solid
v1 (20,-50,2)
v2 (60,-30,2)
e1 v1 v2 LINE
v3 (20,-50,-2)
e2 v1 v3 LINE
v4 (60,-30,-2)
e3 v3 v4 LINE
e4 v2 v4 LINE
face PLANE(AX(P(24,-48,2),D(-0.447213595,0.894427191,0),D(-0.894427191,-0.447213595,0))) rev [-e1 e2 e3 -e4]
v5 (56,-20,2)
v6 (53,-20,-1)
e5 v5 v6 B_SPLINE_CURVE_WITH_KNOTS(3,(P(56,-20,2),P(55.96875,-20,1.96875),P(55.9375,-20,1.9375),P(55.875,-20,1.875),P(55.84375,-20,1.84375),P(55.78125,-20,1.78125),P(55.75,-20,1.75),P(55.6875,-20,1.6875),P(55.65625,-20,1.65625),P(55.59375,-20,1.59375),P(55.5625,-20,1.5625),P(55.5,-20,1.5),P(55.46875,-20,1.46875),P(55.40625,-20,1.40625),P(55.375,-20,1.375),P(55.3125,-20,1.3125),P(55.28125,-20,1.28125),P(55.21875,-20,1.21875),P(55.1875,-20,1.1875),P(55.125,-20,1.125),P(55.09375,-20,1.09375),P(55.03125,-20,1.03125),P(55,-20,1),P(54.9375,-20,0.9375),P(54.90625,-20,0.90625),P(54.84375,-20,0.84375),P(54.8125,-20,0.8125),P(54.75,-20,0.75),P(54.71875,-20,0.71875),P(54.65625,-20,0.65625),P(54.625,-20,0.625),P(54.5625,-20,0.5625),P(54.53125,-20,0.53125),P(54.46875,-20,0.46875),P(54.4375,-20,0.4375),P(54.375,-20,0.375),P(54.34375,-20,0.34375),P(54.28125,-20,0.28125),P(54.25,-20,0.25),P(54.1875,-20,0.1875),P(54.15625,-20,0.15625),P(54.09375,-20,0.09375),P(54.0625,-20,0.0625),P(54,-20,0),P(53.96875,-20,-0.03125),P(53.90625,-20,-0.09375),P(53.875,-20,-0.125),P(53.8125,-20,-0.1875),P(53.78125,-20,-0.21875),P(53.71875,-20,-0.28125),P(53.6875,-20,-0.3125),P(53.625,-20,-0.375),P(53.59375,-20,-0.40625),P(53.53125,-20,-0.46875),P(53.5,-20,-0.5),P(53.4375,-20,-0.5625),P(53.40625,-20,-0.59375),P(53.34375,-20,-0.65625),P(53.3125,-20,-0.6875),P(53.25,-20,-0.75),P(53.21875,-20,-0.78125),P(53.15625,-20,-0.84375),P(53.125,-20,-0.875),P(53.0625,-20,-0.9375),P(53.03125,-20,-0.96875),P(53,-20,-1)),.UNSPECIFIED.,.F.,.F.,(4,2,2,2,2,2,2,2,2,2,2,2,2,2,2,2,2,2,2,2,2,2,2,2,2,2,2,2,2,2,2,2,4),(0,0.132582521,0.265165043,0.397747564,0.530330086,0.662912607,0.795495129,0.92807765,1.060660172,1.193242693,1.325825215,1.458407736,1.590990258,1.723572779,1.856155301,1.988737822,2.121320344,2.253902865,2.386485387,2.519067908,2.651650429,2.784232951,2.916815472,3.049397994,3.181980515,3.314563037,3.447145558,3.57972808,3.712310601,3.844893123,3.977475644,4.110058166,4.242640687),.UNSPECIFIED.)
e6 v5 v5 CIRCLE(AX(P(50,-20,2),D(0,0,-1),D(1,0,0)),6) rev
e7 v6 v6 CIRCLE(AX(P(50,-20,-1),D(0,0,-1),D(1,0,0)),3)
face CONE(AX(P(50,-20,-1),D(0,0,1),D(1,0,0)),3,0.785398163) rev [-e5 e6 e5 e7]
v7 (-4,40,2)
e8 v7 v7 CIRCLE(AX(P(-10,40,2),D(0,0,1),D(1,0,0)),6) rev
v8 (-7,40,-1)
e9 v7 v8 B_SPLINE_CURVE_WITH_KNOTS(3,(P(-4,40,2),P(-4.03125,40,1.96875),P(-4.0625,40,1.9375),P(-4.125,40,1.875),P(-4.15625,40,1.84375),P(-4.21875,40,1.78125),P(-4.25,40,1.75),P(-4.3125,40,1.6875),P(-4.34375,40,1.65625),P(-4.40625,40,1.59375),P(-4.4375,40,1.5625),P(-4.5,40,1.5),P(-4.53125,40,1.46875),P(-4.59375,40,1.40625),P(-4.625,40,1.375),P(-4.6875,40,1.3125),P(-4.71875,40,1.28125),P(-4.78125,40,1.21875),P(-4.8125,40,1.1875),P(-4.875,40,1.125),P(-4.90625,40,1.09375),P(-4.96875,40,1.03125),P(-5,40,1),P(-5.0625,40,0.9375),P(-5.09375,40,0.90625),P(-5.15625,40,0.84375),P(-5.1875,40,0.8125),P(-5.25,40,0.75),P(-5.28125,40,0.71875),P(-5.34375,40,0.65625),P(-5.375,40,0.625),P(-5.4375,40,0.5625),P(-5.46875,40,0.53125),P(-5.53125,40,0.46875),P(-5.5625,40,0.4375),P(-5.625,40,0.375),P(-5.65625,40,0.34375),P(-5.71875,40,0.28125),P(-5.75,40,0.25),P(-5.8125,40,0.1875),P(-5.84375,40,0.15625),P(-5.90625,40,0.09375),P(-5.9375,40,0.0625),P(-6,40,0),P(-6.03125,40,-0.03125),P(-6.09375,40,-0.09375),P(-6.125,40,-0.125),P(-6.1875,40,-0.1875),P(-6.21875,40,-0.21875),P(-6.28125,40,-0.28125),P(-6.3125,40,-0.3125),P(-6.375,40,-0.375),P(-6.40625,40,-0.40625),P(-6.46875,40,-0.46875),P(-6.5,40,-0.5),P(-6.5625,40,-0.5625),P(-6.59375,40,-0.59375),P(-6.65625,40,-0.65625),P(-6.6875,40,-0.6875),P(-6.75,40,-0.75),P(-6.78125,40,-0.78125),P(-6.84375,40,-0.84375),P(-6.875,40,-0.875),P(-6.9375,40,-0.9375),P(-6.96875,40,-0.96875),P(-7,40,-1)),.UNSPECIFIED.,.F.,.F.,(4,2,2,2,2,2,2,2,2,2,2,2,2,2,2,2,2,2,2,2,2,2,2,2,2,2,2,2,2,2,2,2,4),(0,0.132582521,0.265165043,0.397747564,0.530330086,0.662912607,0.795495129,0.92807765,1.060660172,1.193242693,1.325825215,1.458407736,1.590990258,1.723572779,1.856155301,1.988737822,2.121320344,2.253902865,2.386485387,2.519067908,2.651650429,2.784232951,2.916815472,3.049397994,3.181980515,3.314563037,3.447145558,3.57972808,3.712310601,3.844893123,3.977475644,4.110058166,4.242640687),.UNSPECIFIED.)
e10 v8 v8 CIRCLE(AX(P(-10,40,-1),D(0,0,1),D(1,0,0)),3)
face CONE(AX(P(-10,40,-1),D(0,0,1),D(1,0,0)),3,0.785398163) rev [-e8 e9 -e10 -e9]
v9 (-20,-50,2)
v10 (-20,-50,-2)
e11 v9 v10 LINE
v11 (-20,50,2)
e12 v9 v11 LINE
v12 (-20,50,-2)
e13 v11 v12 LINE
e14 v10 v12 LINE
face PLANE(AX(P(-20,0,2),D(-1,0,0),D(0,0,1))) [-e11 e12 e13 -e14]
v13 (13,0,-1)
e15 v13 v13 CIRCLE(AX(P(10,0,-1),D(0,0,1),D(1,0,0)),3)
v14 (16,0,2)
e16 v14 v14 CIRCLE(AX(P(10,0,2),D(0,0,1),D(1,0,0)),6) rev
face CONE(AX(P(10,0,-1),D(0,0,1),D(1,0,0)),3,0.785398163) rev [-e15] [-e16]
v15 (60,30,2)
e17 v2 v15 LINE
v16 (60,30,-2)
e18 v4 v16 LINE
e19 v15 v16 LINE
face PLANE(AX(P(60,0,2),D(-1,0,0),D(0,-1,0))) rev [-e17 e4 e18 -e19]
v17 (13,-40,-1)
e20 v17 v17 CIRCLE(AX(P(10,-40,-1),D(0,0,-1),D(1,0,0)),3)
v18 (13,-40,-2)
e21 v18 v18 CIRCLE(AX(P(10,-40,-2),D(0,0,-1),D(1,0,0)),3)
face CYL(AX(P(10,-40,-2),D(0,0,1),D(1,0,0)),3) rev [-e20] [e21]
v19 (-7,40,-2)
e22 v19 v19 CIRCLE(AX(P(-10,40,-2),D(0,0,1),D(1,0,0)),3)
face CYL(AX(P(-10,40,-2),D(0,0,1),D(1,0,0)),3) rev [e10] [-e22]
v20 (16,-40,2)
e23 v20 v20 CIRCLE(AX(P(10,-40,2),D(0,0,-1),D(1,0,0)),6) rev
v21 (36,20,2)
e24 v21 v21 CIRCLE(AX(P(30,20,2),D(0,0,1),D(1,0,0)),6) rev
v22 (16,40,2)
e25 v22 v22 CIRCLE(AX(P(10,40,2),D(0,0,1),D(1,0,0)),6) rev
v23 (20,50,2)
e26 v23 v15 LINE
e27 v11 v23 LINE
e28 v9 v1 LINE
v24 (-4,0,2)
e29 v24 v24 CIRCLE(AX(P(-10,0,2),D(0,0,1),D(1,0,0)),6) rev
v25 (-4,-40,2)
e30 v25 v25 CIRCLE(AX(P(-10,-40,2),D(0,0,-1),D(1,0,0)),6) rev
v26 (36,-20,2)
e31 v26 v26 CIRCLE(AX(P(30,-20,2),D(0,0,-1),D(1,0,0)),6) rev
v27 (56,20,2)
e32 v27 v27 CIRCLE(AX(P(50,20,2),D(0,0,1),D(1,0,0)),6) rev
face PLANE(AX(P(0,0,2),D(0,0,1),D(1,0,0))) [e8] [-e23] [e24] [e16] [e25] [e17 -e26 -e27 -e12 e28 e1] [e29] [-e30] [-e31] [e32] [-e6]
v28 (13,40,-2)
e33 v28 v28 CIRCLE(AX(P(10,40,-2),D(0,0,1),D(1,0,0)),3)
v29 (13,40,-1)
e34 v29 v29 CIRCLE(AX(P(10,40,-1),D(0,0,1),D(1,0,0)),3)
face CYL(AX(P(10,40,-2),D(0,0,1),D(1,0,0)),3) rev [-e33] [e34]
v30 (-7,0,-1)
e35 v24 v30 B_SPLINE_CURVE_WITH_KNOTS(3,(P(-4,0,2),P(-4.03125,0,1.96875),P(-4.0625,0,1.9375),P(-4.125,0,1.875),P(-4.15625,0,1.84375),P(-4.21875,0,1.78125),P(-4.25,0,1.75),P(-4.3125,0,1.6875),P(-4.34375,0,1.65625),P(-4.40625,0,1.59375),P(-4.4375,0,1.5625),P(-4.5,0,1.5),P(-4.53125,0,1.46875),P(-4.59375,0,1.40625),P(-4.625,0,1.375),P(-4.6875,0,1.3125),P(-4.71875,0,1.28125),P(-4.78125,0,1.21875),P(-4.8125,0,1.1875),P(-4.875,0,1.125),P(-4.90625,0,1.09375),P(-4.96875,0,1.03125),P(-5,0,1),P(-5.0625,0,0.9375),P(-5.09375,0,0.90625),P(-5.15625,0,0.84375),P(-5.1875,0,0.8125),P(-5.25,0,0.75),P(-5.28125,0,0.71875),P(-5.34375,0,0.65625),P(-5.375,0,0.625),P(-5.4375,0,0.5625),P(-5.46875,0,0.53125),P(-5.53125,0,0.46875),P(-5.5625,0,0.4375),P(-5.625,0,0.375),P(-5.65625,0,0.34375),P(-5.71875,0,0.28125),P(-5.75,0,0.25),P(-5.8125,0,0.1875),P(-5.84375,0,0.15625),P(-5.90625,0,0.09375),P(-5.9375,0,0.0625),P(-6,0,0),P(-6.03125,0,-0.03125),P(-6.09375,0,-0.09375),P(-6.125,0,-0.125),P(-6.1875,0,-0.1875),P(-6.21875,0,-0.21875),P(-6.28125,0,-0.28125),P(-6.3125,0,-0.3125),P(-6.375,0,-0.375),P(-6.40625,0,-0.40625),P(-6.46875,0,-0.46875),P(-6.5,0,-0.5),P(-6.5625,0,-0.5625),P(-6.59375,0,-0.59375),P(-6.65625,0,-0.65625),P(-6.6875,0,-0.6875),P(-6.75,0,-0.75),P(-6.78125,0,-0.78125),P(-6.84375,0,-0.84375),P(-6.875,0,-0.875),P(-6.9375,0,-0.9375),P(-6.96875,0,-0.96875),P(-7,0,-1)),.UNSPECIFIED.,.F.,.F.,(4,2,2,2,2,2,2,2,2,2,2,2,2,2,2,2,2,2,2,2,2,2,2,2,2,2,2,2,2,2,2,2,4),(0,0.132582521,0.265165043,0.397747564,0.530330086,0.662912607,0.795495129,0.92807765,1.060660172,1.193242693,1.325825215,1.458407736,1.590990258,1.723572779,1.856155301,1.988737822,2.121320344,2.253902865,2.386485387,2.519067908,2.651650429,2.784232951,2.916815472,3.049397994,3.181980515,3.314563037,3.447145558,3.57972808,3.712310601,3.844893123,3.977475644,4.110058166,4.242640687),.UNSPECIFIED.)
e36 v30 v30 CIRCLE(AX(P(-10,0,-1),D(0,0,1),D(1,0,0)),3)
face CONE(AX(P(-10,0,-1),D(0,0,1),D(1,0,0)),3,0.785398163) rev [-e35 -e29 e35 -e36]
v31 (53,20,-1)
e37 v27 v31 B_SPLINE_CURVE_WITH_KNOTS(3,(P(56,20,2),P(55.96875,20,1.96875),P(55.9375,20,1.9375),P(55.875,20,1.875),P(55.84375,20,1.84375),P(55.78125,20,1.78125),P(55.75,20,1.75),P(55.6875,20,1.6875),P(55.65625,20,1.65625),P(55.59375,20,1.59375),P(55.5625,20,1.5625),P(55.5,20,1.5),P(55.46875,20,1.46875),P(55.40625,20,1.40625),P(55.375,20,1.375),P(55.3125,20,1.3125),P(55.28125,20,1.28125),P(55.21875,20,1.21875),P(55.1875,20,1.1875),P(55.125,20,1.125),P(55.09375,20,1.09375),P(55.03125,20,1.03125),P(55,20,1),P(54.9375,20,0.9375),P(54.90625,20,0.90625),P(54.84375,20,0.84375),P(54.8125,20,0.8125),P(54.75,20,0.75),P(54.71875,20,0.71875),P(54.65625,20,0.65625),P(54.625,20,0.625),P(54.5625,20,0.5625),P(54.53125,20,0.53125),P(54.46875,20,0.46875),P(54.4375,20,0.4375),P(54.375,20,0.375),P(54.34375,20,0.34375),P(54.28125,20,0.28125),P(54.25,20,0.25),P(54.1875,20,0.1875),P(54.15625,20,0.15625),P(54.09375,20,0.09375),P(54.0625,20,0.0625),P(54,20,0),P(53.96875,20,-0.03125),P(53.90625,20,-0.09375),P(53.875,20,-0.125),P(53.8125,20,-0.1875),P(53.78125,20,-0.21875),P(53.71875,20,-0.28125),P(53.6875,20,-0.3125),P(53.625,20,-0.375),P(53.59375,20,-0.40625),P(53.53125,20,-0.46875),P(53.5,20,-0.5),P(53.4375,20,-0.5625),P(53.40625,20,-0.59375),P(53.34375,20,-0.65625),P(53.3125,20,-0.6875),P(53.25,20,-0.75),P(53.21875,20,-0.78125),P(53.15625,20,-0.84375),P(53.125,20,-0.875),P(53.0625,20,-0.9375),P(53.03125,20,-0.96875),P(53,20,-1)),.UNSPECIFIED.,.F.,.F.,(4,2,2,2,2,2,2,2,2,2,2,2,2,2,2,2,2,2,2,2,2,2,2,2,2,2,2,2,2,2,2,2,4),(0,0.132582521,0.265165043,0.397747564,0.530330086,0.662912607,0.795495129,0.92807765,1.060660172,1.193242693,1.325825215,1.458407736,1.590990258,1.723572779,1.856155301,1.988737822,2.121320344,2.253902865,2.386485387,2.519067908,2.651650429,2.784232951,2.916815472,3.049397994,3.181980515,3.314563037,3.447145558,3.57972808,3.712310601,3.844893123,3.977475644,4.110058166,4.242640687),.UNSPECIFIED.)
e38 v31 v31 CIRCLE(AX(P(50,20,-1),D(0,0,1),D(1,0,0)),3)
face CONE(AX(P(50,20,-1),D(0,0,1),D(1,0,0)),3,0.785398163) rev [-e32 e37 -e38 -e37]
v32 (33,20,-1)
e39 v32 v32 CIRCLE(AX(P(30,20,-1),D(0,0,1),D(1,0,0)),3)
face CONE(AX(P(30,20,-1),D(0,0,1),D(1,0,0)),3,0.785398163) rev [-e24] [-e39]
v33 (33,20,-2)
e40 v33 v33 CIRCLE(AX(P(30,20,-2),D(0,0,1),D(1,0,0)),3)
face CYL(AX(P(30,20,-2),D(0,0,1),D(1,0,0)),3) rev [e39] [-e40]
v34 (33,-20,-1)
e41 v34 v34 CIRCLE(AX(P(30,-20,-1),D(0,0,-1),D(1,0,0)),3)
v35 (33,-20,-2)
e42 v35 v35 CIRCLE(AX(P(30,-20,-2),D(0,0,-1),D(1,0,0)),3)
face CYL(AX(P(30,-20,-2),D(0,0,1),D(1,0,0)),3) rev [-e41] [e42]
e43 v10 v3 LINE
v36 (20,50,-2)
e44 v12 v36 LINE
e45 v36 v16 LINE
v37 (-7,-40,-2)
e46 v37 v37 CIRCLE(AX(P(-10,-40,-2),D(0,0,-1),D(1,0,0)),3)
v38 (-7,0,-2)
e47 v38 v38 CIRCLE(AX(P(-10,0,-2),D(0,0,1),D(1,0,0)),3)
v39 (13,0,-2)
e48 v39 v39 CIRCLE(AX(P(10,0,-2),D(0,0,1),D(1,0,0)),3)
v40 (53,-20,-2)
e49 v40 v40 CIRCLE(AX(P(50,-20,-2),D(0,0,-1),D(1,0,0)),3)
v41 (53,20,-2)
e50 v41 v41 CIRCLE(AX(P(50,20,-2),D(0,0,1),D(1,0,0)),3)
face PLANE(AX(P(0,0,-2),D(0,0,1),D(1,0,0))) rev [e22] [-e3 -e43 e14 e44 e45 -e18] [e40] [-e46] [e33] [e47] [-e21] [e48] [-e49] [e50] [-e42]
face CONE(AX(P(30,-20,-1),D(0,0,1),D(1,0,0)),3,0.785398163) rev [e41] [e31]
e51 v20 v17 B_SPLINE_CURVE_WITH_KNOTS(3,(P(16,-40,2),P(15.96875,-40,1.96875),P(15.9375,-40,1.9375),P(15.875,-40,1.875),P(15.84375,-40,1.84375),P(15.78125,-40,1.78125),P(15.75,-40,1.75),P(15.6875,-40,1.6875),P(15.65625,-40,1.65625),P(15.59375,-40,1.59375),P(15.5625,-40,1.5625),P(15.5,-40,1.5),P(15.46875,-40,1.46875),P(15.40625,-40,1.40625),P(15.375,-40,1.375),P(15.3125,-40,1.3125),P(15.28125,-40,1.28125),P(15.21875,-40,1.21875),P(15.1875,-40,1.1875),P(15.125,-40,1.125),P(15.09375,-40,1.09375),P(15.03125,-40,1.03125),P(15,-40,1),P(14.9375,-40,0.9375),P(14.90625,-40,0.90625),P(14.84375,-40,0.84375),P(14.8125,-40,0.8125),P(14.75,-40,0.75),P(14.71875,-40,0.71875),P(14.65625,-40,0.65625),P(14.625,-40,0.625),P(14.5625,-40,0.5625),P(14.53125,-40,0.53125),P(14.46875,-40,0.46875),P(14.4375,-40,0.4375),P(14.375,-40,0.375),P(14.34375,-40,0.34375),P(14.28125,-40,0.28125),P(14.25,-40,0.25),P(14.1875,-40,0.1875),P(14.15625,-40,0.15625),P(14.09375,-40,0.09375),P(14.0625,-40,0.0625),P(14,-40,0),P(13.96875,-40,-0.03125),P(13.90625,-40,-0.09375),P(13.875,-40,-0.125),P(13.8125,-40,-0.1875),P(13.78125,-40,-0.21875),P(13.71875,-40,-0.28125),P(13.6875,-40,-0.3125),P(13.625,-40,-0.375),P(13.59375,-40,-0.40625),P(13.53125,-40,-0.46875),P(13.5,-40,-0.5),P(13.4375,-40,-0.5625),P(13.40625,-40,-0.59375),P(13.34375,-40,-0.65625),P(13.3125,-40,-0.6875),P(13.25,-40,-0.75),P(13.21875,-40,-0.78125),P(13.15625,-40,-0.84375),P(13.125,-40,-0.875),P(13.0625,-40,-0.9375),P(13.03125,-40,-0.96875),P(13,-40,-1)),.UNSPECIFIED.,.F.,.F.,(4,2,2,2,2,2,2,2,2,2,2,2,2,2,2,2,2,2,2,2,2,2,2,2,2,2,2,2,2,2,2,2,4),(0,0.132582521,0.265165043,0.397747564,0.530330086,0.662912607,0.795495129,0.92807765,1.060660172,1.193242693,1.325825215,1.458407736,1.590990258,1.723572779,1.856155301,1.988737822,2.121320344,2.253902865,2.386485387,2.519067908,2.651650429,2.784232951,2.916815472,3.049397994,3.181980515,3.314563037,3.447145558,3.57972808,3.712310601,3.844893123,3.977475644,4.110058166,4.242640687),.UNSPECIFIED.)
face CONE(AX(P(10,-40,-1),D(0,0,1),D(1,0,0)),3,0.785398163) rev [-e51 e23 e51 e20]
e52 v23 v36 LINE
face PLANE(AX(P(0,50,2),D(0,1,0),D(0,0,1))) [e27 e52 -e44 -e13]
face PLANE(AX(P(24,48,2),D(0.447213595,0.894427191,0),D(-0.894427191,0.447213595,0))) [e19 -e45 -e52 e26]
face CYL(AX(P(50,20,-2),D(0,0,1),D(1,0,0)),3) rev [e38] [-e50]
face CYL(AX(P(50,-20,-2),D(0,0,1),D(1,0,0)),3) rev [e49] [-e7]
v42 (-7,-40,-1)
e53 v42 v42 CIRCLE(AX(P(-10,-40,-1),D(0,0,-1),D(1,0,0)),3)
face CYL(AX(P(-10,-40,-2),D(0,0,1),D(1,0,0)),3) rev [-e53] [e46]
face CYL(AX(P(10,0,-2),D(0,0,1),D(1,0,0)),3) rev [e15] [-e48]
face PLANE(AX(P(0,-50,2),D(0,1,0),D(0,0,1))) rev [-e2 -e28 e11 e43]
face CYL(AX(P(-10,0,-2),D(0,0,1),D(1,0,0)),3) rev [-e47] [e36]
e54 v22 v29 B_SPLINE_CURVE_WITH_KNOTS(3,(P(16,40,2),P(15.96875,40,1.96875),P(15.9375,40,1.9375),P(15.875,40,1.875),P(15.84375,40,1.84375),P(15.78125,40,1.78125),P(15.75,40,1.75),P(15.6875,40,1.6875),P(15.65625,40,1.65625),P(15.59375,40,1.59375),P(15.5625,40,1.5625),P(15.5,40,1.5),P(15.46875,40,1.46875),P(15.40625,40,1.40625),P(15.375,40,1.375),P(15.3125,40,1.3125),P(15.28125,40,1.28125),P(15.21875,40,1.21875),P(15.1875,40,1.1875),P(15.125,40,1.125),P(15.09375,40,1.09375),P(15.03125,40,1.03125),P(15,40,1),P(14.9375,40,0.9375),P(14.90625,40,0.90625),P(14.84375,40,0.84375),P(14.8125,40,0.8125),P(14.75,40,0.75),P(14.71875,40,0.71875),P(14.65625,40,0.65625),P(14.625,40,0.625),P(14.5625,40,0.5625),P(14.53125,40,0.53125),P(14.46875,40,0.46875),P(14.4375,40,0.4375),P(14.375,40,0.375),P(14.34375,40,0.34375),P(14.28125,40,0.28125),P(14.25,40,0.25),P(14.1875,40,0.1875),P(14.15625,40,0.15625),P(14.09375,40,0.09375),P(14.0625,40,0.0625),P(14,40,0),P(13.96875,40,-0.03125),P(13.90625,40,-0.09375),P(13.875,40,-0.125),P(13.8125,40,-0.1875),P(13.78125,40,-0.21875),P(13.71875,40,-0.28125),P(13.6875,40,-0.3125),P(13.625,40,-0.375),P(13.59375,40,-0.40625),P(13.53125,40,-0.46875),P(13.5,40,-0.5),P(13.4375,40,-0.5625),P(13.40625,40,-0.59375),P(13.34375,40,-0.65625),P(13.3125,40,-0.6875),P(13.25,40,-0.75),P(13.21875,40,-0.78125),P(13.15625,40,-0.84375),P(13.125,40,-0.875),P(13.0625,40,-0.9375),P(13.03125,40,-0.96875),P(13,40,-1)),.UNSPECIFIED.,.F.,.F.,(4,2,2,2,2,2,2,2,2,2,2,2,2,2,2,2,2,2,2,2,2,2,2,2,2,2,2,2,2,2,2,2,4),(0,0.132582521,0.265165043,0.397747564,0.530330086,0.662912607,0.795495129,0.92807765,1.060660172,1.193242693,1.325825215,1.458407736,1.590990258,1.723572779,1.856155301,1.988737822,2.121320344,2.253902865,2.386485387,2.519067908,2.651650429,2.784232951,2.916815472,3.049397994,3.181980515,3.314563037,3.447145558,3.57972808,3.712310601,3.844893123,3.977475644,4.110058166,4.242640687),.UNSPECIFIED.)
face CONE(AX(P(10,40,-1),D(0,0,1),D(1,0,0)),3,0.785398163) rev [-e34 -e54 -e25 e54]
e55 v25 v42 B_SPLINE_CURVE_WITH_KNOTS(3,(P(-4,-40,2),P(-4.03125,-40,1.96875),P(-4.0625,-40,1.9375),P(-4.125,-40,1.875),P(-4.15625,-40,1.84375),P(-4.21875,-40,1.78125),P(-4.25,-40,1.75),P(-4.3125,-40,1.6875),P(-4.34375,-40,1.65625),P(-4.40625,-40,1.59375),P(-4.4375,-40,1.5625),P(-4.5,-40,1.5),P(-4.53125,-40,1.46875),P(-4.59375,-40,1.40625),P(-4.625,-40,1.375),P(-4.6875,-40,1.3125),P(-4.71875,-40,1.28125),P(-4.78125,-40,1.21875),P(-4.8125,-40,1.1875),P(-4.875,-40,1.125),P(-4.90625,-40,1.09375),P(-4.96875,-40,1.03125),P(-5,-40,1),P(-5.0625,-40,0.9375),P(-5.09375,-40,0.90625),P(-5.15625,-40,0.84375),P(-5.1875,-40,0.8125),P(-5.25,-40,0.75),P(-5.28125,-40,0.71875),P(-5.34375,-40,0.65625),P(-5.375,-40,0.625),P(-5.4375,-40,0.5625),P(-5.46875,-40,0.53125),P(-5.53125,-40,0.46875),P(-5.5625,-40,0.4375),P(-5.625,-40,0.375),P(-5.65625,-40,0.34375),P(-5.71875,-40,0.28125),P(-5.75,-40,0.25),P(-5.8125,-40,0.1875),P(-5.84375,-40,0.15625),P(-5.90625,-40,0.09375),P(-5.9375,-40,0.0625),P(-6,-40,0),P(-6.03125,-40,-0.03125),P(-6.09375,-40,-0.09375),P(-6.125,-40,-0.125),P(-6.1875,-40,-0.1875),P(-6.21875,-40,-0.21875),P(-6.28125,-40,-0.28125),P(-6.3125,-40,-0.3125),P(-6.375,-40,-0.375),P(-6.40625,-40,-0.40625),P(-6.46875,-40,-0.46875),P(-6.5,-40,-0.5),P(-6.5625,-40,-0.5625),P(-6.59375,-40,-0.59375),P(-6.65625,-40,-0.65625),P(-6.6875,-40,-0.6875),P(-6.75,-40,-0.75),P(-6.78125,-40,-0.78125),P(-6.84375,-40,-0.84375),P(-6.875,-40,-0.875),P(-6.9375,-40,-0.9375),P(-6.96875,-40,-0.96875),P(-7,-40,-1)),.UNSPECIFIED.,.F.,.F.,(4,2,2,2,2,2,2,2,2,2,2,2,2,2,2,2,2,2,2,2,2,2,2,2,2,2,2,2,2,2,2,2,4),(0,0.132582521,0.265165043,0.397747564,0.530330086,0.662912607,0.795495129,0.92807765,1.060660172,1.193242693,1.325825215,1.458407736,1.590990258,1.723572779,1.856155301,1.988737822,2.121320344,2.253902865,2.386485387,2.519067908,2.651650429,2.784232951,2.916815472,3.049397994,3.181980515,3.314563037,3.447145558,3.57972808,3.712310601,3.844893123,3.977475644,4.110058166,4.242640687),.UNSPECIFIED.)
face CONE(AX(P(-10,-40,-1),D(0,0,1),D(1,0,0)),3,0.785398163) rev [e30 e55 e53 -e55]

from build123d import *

# Parameters (mm, degrees)
SKETCH1_W           = 40
SKETCH1_H           = 100
SKETCH1_H_2         = 60
BOSS_EXTRUDE1_DEPTH = 2
SKETCH2_R           = 3
CUT_EXTRUDE1_DEPTH  = 79.204859184
CHAMFER1_SIZE       = 3


# Read off the part's stored shape, not the designer's step: Mirror2
with BuildPart() as part:
    # Sketch1 → Boss-Extrude1 (new, symmetric)
    with BuildSketch(Plane.XY):
        Rectangle(SKETCH1_W, SKETCH1_H)
        with Locations((40, 0)):
            Rectangle(SKETCH1_W, SKETCH1_H_2)
        Polygon((60, 30), (20, 50), (20, 30), align=None)
        Polygon((20, -30), (20, -50), (60, -30), align=None)
    extrude(amount=BOSS_EXTRUDE1_DEPTH, both=True)

    # Sketch2 → Cut-Extrude1 (cut, through all)
    with BuildSketch(Plane.XY.offset(2)):
        with Locations((50, 20)):
            Circle(SKETCH2_R)
        with Locations((30, 20)):
            Circle(SKETCH2_R)
        with Locations((-10, 0)):
            Circle(SKETCH2_R)
        with Locations((10, 0)):
            Circle(SKETCH2_R)
        with Locations((-10, 40)):
            Circle(SKETCH2_R)
        with Locations((10, 40)):
            Circle(SKETCH2_R)
    extrude(amount=-CUT_EXTRUDE1_DEPTH, mode=Mode.SUBTRACT)

    # Chamfer1
    chamfer1_edges = [part.edges().sort_by_distance(p)[0] for p in [
        (47, 20, 2),
        (7, 40, 2),
        (27, 20, 2),
        (-13, 0, 2),
        (7, 0, 2),
        (-13, 40, 2),
    ]]
    chamfer(chamfer1_edges, length=CHAMFER1_SIZE)

    # Mirror2 outline → Mirror2 (revolve, cut)
    with BuildSketch(Plane(origin=(-10, -40, 0), x_dir=(1, 0, 0), z_dir=(0, -1, 0))):
        Polygon((0, -2), (3, -2), (3, -1), (6, 2), (0, 2), align=None)
    revolve(axis=Axis((-10, -40, 0), (0, 0, 1)), mode=Mode.SUBTRACT)

    # Mirror2 2 outline → Mirror2 2 (revolve, cut)
    with BuildSketch(Plane(origin=(50, -20, 0), x_dir=(1, 0, 0), z_dir=(0, -1, 0))):
        Polygon((0, -2), (3, -2), (3, -1), (6, 2), (0, 2), align=None)
    revolve(axis=Axis((50, -20, 0), (0, 0, 1)), mode=Mode.SUBTRACT)

    # Mirror2 3 outline → Mirror2 3 (revolve, cut)
    with BuildSketch(Plane(origin=(30, -20, 0), x_dir=(1, 0, 0), z_dir=(0, -1, 0))):
        Polygon((0, -2), (3, -2), (3, -1), (6, 2), (0, 2), align=None)
    revolve(axis=Axis((30, -20, 0), (0, 0, 1)), mode=Mode.SUBTRACT)

    # Mirror2 4 outline → Mirror2 4 (revolve, cut)
    with BuildSketch(Plane(origin=(10, -40, 0), x_dir=(1, 0, 0), z_dir=(0, -1, 0))):
        Polygon((0, -2), (3, -2), (3, -1), (6, 2), (0, 2), align=None)
    revolve(axis=Axis((10, -40, 0), (0, 0, 1)), mode=Mode.SUBTRACT)


solid = part.part
